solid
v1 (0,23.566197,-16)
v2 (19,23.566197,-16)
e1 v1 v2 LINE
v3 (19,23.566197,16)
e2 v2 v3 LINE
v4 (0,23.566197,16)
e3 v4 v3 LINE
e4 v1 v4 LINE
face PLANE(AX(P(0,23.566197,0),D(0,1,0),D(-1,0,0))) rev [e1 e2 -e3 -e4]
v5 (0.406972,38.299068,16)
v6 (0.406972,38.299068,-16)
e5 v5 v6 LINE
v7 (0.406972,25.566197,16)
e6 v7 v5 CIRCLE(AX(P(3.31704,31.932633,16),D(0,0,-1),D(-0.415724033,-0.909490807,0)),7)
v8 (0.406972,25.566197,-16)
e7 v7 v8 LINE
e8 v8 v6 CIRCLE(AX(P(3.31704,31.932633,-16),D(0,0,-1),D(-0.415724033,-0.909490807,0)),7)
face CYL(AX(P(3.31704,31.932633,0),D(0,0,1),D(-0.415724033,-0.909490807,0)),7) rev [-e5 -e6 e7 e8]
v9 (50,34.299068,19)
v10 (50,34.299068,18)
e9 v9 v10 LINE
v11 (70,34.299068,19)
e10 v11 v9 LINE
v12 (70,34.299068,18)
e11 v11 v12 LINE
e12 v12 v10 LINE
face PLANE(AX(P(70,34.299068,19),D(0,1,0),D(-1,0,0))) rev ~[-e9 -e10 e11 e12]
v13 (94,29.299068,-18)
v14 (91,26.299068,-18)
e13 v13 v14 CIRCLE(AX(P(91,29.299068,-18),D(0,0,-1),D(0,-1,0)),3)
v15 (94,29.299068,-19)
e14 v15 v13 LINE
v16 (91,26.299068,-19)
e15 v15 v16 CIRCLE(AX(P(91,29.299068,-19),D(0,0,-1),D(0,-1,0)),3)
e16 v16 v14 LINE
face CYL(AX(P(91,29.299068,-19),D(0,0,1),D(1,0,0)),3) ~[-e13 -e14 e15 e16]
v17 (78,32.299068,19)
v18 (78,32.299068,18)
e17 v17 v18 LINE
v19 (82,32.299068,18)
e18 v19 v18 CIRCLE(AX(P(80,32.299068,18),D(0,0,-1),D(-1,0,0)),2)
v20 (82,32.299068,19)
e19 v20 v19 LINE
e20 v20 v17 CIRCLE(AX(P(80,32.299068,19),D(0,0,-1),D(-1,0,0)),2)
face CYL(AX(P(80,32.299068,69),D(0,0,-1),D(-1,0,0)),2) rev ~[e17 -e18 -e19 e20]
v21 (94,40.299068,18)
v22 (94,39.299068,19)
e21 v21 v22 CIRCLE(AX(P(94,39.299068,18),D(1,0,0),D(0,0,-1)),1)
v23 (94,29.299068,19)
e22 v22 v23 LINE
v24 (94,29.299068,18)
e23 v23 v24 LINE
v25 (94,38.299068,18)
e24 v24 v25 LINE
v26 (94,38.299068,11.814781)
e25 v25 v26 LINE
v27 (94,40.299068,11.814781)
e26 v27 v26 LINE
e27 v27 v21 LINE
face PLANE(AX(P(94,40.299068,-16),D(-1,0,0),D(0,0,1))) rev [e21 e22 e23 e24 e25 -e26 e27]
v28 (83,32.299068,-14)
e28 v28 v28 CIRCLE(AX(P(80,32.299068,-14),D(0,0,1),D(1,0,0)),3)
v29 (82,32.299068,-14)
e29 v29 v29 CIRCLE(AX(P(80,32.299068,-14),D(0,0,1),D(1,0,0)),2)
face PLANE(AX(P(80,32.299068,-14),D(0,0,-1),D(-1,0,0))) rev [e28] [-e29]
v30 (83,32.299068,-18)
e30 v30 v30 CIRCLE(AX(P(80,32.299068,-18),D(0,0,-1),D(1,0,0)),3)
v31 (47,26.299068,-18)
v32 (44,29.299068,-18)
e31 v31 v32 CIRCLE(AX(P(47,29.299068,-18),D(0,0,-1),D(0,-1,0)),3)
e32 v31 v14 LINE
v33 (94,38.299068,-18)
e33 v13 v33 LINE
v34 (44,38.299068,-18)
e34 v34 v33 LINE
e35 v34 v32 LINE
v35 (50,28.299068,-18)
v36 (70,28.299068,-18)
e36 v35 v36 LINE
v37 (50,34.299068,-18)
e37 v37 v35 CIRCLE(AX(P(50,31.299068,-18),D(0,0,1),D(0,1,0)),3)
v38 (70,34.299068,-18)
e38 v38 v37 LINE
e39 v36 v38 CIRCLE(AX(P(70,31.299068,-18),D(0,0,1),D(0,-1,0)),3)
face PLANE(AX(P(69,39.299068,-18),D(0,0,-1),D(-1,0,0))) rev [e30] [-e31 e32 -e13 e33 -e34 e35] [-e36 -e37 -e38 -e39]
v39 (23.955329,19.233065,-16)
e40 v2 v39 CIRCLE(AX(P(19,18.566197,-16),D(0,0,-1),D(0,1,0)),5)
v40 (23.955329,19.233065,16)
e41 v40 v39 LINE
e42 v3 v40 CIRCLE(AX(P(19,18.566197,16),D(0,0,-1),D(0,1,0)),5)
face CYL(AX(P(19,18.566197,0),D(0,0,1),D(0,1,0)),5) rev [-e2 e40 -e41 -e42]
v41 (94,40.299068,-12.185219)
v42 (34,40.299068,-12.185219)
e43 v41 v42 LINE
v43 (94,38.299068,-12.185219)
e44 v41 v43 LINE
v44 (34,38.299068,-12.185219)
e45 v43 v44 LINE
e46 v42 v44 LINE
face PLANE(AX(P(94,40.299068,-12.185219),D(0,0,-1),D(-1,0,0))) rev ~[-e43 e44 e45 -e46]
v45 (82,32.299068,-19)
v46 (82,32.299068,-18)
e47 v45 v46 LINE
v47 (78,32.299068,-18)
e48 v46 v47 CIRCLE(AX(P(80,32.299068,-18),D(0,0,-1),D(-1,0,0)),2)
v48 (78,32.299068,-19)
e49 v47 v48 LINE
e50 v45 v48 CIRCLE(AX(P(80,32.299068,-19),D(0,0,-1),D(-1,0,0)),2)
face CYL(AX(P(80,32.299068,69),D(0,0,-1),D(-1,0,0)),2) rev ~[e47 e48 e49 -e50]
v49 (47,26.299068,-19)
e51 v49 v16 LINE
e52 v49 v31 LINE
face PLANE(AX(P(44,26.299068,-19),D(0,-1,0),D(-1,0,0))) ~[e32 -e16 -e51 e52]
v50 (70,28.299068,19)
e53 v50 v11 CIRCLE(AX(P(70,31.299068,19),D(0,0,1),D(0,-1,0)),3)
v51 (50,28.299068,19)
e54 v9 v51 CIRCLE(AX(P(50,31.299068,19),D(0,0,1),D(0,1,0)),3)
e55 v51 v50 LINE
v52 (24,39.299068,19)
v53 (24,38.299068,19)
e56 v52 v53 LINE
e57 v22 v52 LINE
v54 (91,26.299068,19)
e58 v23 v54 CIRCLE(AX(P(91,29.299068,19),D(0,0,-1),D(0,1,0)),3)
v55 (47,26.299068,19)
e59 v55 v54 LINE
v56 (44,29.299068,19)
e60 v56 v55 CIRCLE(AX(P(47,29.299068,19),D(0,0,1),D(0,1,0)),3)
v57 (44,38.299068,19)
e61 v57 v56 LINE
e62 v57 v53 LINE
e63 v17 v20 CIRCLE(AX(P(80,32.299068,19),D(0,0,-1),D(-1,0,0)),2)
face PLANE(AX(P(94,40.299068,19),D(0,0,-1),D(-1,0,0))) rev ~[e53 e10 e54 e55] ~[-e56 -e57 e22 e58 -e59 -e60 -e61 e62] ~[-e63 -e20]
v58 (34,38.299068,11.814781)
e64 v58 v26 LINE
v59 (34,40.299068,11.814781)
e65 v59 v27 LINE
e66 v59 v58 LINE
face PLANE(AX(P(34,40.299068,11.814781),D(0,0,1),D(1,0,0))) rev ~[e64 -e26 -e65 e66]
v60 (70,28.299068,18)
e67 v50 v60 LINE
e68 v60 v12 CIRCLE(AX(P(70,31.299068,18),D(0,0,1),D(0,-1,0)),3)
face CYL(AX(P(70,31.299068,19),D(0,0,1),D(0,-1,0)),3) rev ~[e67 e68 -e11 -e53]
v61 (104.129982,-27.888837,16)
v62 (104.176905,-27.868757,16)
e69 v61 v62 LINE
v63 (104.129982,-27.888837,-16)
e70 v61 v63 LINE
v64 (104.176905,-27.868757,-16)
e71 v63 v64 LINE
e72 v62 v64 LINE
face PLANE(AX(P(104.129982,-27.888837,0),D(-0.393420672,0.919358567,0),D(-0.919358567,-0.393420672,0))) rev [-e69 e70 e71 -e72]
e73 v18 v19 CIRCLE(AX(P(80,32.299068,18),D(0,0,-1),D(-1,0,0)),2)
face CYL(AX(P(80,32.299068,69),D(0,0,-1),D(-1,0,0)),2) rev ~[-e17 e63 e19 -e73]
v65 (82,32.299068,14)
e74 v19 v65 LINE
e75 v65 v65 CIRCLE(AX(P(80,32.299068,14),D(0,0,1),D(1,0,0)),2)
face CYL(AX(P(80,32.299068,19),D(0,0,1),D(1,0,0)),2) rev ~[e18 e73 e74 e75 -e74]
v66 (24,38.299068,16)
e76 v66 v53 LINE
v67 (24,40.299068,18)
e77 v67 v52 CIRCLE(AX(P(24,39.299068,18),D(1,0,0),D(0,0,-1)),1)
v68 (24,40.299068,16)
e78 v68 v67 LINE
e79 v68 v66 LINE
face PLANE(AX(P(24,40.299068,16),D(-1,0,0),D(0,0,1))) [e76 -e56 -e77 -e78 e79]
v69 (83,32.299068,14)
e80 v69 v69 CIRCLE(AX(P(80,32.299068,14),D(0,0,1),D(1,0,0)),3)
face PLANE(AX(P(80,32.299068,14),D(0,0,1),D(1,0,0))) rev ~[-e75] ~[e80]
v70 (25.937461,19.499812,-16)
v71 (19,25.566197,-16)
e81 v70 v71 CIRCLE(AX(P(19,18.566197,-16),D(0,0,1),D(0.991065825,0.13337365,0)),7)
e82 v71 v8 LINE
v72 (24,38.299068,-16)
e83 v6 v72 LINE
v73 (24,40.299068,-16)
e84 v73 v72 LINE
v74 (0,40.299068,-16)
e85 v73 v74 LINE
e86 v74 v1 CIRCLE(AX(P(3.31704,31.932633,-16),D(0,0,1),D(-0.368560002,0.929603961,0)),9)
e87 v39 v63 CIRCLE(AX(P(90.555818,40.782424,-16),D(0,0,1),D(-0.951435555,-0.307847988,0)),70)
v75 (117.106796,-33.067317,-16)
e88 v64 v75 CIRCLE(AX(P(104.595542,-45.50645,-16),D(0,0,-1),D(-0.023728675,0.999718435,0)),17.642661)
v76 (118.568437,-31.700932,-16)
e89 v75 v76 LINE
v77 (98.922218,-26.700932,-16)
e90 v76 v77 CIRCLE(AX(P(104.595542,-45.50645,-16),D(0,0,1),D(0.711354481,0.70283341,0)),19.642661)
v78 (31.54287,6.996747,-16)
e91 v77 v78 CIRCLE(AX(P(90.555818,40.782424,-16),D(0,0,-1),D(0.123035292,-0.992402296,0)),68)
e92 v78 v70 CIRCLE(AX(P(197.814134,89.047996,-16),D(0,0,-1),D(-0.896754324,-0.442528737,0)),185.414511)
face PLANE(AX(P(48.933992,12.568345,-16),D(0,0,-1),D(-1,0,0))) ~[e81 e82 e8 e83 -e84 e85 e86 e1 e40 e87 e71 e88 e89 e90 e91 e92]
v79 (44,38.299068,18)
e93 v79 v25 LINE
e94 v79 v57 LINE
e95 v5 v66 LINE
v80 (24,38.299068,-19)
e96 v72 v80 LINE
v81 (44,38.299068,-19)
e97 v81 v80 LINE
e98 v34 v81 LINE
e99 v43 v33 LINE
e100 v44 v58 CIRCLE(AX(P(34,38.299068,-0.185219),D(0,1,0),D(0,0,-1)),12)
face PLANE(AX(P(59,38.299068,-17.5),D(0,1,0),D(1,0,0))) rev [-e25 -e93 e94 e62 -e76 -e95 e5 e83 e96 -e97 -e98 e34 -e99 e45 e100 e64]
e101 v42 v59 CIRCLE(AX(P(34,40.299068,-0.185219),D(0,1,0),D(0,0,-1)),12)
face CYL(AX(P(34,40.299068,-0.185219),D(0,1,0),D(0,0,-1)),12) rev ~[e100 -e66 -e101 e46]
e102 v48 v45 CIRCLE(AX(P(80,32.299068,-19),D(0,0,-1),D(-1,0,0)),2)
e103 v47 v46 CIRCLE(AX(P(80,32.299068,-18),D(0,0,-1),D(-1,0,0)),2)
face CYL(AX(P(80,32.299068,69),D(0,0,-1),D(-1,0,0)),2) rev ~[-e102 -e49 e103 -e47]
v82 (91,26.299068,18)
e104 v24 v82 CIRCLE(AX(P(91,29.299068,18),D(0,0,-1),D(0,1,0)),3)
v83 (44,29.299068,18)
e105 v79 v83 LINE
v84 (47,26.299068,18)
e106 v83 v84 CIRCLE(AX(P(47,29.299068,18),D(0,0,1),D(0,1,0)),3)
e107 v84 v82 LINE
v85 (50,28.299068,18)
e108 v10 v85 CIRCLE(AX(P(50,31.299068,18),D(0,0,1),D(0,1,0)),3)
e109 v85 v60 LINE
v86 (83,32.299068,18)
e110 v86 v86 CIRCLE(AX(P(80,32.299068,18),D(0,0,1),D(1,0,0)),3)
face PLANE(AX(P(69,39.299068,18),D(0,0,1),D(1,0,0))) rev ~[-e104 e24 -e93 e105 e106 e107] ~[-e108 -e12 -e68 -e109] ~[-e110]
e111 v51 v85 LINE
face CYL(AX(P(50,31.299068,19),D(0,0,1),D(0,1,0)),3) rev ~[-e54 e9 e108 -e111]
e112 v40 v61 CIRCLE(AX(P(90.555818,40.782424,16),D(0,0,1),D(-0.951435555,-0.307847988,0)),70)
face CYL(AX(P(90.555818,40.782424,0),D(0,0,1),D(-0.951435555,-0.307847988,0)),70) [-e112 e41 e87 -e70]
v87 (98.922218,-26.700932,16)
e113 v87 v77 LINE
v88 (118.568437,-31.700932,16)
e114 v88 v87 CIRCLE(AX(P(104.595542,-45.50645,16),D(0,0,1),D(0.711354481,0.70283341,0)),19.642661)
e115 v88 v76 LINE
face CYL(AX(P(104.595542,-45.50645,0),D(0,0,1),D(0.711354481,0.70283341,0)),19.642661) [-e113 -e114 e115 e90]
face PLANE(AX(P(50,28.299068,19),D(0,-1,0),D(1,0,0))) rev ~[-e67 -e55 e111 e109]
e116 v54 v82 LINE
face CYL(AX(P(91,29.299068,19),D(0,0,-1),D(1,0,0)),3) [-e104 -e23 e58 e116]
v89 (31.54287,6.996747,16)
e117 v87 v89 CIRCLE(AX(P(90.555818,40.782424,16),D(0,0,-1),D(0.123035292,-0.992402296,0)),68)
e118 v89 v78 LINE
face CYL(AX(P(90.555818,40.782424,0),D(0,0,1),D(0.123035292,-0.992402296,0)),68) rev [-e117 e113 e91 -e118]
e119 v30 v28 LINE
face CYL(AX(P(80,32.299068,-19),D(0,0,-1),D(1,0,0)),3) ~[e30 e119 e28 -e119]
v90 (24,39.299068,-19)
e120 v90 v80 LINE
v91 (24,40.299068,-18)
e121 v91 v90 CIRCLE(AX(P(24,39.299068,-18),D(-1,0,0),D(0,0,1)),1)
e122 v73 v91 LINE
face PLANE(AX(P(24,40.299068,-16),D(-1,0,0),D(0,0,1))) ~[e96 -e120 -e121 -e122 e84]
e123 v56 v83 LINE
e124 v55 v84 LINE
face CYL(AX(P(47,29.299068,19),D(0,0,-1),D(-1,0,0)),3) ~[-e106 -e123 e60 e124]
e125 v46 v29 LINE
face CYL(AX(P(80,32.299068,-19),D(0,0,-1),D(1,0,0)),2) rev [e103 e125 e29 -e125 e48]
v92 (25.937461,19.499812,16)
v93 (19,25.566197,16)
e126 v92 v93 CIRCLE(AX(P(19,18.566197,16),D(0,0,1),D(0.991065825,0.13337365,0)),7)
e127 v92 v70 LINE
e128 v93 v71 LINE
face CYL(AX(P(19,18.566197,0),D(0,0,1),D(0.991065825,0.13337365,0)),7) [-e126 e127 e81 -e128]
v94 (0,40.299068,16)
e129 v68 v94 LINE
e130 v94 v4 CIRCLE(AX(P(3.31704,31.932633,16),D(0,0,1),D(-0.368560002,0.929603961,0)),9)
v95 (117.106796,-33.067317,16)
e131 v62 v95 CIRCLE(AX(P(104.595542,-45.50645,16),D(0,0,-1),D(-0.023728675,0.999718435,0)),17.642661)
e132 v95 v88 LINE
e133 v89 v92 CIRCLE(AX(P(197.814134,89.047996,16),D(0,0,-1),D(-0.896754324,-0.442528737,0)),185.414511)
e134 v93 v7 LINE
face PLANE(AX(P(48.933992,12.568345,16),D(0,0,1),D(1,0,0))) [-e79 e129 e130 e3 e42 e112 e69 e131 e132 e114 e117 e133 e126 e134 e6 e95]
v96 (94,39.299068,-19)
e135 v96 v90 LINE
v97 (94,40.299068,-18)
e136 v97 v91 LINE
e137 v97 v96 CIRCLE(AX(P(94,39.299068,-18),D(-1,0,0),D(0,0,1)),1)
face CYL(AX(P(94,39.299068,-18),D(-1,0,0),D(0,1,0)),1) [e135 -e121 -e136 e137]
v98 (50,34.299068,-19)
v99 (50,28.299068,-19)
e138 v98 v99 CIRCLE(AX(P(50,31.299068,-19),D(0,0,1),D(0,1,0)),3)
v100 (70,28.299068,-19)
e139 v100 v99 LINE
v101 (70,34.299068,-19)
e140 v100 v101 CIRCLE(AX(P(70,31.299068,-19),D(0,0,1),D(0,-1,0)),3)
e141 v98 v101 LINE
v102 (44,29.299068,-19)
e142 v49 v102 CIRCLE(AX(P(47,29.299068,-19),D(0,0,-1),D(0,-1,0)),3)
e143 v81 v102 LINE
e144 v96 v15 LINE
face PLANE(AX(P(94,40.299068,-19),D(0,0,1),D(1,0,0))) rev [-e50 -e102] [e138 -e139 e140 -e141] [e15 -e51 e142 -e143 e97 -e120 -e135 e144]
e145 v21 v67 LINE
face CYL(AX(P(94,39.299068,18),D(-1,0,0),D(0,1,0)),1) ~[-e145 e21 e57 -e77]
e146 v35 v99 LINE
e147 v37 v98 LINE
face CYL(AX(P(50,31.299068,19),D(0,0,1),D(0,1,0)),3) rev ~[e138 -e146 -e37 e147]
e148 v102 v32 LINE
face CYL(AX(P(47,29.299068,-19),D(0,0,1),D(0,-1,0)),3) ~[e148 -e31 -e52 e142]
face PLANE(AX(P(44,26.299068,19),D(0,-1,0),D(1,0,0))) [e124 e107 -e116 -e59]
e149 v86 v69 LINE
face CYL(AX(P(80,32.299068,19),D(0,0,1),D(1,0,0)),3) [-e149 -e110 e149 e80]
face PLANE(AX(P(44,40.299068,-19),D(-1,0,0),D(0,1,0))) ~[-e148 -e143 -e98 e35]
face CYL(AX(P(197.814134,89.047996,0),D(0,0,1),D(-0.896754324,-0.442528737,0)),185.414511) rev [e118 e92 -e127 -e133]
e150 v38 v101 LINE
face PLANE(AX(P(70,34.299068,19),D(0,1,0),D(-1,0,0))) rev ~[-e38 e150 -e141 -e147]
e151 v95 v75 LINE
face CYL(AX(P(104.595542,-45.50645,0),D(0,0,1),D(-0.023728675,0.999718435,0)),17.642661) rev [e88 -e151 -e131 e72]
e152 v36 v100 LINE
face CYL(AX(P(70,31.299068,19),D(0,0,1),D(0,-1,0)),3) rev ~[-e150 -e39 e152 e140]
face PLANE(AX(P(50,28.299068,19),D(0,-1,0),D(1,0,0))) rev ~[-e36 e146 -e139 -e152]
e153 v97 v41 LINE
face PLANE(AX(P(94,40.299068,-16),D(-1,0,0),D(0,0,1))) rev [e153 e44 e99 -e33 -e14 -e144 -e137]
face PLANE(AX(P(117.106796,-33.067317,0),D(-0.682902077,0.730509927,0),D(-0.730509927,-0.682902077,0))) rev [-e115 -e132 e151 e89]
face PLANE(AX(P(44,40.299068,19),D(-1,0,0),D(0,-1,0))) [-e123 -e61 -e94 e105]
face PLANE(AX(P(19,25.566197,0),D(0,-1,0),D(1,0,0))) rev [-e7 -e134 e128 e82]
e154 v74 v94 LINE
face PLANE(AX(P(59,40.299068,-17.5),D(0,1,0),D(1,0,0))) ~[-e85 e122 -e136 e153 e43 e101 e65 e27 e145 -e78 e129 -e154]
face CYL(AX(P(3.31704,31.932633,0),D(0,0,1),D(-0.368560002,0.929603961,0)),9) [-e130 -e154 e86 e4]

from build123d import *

# Parameters (mm, degrees)
F1_DEPTH  = 16
F2_W      = 70
F2_H      = 3
F3_DEPTH  = 2
F4_W      = 50
F4_H      = 2
F4_H_2    = 12
F5_DEPTH  = 1
F6_R      = 1
F9_DEPTH  = 2
F11_DEPTH = 38.001
F13_D     = 4
F13_DEPTH = 50
F13_TIP   = 1.2017212381
F14_R     = 3
F14_R_2   = 2
F15_DEPTH = 5
F16_R     = 3


# Not quite as in the source:
# - a pattern or mirror of a feature is missing from the dataset's text; its kind, count and spacing are read off the source's solid


with BuildPart() as f1:
    # F0 (on Top) → F1 (new body)
    with BuildSketch(Plane.XY):
        with BuildLine():
            Line((94, 38.2990682213), (94, 40.2990682213))
            Line((94, 40.2990682213), (0, 40.2990682213))
            ThreePointArc((0, 40.2990682213), (-5.6829599791, 31.9326325705), (0, 23.5661969196))
            Line((0, 23.5661969196), (19, 23.5661969196))
            ThreePointArc((19, 23.5661969196), (22.2913263859, 22.330127129), (23.9553291252, 19.2330651681))
            ThreePointArc((23.9553291252, 19.2330651681), (55.0865893222, -19.5660123964), (104.1299821488, -27.8888365183))
            Line((104.1299821488, -27.8888365183), (104.1769053316, -27.8687567031))
            ThreePointArc((104.1769053316, -27.8687567031), (111.1768871923, -29.1372905243), (117.1067956471, -33.0673172193))
            Line((117.1067956471, -33.0673172193), (118.5684373125, -31.7009317787))
            ThreePointArc((118.5684373125, -31.7009317787), (109.440201014, -26.4706046683), (98.9222178887, -26.7009317787))
            ThreePointArc((98.9222178887, -26.7009317787), (60.1395132052, -20.0357341509), (31.5428701215, 6.9967471693))
            ThreePointArc((31.5428701215, 6.9967471693), (28.6246292953, 13.1964823258), (25.9374607753, 19.4998124675))
            ThreePointArc((25.9374607753, 19.4998124675), (23.6078569403, 23.8356992128), (19, 25.5661969196))
            Line((19, 25.5661969196), (0.4069717908, 25.5661969196))
            ThreePointArc((0.4069717908, 25.5661969196), (-3.6829599791, 31.9326325705), (0.4069717908, 38.2990682213))
            Line((0.4069717908, 38.2990682213), (94, 38.2990682213))
        make_face()
    extrude(amount=F1_DEPTH)

    # F2 (on face) → F3 (join)
    with BuildSketch(Plane(origin=(0, 40.2990682213, 0), x_dir=(-1, 0, 0), z_dir=(0, 1, 0))):
        with Locations((-59, 17.5)):
            Rectangle(F2_W, F2_H)
    extrude(amount=-F3_DEPTH)

    # F4 (on face) → F5 (join)
    with BuildSketch(Plane.XY.offset(19)):
        with Locations((69, 39.2990682213)):
            Rectangle(F4_W, F4_H)
        with Locations((69, 32.2990682213)):
            Rectangle(F4_W, F4_H_2)
    extrude(amount=-F5_DEPTH)

    # F6
    f6_edges = [f1.edges().sort_by_distance(p)[0] for p in [
        (59, 40.299068, 19),
    ]]
    fillet(f6_edges, radius=F6_R)

    # F7: F1 across face


with BuildPart() as f1_1:
    add(f1.part)
    add(f1.part.mirror(Plane(origin=(48.2414959272, 12.2129217621, 0), x_dir=(1, 0, 0), z_dir=(0, 0, -1))))

    # F8 (on face) → F9 (cut)
    with BuildSketch(Plane(origin=(0, 40.2990682213, 0), x_dir=(-1, 0, 0), z_dir=(0, 1, 0))):
        with BuildLine():
            Line((-34, 11.8147813603), (-94, 11.8147813603))
            Line((-94, 11.8147813603), (-94, -12.1852186397))
            Line((-94, -12.1852186397), (-34, -12.1852186397))
            ThreePointArc((-34, -12.1852186397), (-22, -0.1852186397), (-34, 11.8147813603))
        make_face()
    extrude(amount=-F9_DEPTH, mode=Mode.SUBTRACT)

    # F10 (on face) → F11 (cut, through all)
    with BuildSketch(Plane.XY.offset(19)):
        with BuildLine():
            ThreePointArc((50, 34.2990682213), (47, 31.2990682213), (50, 28.2990682213))
            Line((50, 28.2990682213), (70, 28.2990682213))
            ThreePointArc((70, 28.2990682213), (73, 31.2990682213), (70, 34.2990682213))
            Line((70, 34.2990682213), (50, 34.2990682213))
        make_face()
    extrude(amount=-F11_DEPTH, mode=Mode.SUBTRACT)

    # F13
    with Locations(Plane.XY.offset(19)):
        with Locations((80, 32.2990682213)):
            Hole(F13_D / 2, depth=F13_DEPTH)
            with Locations((0, 0, -(F13_DEPTH + F13_TIP / 2))):  # 118° drill point
                Cone(0, F13_D / 2, F13_TIP, mode=Mode.SUBTRACT)

    # F14 (on face) → F15 (join)
    with BuildSketch(Plane.XY.offset(19)):
        with Locations((80, 32.2990682213)):
            Circle(F14_R)
        with Locations((80, 32.2990682213)):
            Circle(F14_R_2, mode=Mode.SUBTRACT)
    f15 = extrude(amount=-F15_DEPTH)

    # F15_copies: F15 across plane
    add(f15.mirror(Plane(origin=(0, 0, 0), x_dir=(-1, 0, 0), z_dir=(0, 0, -1))))

    # F16
    f16_edges = [f1_1.edges().sort_by_distance(p)[0] for p in [
        (44, 26.299068, 18.5),
        (44, 26.299068, -18.5),
        (94, 26.299068, -18.5),
        (94, 26.299068, 18.5),
    ]]
    fillet(f16_edges, radius=F16_R)


solid = f1_1.part
